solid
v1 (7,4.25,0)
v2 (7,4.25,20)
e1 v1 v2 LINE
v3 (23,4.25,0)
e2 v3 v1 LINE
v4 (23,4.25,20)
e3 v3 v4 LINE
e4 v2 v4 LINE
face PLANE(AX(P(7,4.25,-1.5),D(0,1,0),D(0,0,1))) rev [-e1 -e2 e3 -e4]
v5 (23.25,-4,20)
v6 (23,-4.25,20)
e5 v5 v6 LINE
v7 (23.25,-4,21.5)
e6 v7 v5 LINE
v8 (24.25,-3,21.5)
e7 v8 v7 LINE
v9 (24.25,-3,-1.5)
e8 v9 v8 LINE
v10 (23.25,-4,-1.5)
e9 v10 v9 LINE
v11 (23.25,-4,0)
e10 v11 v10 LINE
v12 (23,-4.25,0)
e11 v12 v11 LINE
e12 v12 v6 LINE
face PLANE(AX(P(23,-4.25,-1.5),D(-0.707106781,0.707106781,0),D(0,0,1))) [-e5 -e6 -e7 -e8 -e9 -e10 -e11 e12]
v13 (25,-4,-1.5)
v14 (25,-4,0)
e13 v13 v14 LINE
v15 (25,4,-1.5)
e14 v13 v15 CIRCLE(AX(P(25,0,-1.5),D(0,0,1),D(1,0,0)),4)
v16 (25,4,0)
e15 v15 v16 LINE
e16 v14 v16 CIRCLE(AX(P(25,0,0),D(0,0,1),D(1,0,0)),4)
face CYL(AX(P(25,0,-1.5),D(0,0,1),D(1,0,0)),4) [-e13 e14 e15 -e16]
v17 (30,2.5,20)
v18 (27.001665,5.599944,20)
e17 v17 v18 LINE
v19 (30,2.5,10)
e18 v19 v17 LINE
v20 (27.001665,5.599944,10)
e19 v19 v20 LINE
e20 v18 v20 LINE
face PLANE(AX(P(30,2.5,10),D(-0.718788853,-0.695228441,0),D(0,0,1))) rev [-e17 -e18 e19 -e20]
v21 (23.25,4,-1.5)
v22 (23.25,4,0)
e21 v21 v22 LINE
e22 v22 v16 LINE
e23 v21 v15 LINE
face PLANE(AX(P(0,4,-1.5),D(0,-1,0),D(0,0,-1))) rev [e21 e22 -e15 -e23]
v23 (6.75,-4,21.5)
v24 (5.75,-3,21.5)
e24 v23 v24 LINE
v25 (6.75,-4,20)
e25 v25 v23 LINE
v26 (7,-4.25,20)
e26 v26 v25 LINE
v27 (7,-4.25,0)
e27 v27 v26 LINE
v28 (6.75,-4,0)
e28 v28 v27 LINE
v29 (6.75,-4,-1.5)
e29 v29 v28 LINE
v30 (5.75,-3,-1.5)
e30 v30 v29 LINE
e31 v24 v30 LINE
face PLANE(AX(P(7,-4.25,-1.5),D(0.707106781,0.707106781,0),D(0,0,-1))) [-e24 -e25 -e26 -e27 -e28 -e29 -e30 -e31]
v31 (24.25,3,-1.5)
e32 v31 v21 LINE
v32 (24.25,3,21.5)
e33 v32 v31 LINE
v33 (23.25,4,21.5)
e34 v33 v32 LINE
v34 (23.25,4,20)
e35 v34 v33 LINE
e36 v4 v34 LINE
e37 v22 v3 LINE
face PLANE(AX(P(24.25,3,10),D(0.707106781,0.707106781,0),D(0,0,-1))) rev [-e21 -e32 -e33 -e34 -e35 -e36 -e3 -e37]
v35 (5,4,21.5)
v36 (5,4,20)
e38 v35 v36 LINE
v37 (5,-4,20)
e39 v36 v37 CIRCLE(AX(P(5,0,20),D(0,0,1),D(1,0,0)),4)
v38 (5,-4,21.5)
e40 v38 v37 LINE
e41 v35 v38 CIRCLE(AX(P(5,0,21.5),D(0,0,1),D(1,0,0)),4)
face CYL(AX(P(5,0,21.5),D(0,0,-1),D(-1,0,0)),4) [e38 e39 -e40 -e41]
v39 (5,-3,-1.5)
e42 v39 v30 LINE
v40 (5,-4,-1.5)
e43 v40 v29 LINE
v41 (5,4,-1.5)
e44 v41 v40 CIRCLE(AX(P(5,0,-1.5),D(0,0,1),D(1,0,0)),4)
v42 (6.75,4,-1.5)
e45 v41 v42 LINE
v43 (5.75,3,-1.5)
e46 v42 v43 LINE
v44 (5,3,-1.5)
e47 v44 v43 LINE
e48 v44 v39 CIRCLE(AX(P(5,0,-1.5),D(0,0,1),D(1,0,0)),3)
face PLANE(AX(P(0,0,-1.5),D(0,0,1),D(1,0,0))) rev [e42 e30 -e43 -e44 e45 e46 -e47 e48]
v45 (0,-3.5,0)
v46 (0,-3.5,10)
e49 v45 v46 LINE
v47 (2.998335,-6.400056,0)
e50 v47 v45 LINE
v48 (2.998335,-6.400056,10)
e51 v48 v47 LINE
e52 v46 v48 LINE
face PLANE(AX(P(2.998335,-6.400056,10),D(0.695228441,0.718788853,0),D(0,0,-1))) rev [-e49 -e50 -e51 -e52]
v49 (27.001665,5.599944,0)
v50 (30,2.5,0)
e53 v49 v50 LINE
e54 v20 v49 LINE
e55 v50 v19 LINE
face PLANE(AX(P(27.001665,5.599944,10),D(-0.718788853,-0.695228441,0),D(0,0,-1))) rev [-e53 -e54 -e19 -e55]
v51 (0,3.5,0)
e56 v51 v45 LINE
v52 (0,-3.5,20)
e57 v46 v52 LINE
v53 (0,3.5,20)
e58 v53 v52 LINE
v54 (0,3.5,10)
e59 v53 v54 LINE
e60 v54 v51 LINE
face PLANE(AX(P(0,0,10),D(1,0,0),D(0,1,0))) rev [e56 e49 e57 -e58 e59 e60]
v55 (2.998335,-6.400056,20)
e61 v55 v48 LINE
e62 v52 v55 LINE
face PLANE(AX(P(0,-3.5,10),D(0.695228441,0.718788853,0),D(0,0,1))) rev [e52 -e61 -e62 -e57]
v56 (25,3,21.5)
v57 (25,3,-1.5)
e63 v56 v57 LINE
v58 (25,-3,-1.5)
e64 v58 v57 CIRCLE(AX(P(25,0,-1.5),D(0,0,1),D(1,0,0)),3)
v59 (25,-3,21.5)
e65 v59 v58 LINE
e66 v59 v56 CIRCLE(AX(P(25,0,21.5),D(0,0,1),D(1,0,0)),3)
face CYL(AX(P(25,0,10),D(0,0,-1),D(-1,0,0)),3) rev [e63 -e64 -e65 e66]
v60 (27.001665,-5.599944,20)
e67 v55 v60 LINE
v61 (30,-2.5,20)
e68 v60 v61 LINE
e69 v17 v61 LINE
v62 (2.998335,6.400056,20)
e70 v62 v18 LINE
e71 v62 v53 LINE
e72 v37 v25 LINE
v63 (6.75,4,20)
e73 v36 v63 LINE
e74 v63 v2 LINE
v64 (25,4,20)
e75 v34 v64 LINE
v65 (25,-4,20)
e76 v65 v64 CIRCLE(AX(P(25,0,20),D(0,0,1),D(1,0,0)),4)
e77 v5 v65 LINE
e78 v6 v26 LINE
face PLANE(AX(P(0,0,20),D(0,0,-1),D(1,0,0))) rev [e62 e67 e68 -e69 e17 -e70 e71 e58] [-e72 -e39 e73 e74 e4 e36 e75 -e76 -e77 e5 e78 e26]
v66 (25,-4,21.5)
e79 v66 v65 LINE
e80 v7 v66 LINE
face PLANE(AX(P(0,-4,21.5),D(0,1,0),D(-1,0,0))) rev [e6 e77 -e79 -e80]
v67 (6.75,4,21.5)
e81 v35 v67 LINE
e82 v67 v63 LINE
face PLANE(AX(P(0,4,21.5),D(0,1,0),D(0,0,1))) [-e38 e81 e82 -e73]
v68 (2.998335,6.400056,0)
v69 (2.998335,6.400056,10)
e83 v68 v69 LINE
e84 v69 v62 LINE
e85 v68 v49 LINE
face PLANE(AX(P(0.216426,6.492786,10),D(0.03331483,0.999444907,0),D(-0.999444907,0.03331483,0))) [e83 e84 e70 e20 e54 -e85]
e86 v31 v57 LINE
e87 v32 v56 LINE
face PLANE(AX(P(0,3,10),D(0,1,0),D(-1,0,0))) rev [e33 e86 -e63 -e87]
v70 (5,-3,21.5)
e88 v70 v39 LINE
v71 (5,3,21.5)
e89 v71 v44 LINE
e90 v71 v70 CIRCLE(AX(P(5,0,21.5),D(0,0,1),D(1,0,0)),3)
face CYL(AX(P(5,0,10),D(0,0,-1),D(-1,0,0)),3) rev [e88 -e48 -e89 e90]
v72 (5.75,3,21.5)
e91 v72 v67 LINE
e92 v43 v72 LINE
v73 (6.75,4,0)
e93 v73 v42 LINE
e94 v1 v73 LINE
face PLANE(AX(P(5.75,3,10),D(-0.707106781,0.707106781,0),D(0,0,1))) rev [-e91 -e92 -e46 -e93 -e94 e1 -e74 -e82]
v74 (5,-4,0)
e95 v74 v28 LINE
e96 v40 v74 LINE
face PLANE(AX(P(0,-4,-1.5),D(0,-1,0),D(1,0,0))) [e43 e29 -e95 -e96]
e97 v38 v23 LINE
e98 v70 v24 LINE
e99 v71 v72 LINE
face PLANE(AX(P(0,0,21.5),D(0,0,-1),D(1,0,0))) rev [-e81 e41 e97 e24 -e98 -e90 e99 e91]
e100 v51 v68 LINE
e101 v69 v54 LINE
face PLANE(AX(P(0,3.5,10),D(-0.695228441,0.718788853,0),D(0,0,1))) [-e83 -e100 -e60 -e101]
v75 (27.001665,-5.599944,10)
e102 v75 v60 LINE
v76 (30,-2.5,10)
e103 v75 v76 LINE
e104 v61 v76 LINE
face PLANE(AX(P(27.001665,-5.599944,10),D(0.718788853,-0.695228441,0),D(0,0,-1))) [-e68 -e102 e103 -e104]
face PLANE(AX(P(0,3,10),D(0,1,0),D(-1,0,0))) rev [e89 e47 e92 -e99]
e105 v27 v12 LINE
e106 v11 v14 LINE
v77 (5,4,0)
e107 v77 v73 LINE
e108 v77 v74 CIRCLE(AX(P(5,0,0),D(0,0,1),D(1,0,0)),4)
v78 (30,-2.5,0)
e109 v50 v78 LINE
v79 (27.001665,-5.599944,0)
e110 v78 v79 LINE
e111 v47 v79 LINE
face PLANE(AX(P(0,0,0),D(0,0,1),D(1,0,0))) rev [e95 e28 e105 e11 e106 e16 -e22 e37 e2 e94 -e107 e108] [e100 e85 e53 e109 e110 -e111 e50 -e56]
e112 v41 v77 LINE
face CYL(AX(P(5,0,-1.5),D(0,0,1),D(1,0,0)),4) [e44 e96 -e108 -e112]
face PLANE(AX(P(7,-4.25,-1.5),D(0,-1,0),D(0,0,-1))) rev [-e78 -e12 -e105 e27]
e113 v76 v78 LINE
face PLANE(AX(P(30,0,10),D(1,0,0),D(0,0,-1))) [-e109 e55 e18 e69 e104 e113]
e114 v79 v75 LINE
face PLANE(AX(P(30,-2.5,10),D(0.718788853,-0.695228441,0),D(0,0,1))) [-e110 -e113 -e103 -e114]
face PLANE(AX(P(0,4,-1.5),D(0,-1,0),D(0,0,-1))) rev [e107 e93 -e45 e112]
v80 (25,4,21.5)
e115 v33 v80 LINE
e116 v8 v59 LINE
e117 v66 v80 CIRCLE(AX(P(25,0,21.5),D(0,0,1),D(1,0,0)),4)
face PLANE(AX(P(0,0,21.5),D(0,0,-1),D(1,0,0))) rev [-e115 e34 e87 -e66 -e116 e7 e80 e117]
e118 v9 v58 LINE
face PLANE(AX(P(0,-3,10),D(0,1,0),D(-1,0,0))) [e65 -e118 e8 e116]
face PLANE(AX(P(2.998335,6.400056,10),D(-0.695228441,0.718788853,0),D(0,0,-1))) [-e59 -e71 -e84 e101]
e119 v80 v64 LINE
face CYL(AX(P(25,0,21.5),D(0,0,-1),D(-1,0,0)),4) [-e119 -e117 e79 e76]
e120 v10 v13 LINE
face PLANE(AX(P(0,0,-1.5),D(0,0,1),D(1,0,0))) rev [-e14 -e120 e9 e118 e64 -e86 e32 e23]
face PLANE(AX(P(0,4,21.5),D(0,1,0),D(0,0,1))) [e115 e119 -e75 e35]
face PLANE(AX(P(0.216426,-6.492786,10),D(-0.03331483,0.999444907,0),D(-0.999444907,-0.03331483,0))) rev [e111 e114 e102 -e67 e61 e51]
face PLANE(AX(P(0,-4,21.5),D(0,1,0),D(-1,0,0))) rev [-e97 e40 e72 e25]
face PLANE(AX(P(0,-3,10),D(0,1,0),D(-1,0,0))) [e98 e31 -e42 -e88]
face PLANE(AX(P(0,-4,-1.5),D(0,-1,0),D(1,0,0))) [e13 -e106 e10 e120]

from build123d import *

# Parameters (mm, degrees)
BOSS_EXTRUDE1_DEPTH      = 10
CHAMFER1_SIZE            = 3
BOSS_EXTRUDE2_START      = -1.5
BOSS_EXTRUDE2_DEPTH      = 1.5
CHAMFER1_OF_MIRROR1_SIZE = 3
SKETCH2_W                = 16
SKETCH2_H                = 8.5
CUT_EXTRUDE1_DEPTH       = 39.340066647
CHAMFER2_SIZE            = 1.25


with BuildPart() as part:
    # Sketch1 → Boss-Extrude1 (new body)
    # profile 1 of 2: a face of its own
    with BuildSketch(Plane.XY):
        Polygon((30, 5.5), (30, -5.5), (0, -6.5), (0, 6.5), align=None)
        with BuildLine():
            ThreePointArc((5, 4), (1, 0), (5, -4))
            Line((5, -4), (25, -4))
            ThreePointArc((25, -4), (29, 0), (25, 4))
            Line((25, 4), (5, 4))
        make_face(mode=Mode.SUBTRACT)
    # profile 2 of 2: a face of its own
    with BuildSketch(Plane.XY):
        with BuildLine():
            Line((5, 4), (25, 4))
            ThreePointArc((25, 4), (29, 0), (25, -4))
            Line((25, -4), (5, -4))
            ThreePointArc((5, -4), (1, 0), (5, 4))
        make_face()
        with BuildLine():
            ThreePointArc((25, -3), (28, 0), (25, 3))
            Line((25, 3), (5, 3))
            ThreePointArc((5, 3), (2, 0), (5, -3))
            Line((5, -3), (25, -3))
        make_face(mode=Mode.SUBTRACT)
    boss_extrude1 = extrude(amount=BOSS_EXTRUDE1_DEPTH)

    # Chamfer1
    chamfer1_edges = [part.edges().sort_by_distance(p)[0] for p in [
        (30, -5.5, 5),
        (0, -6.5, 5),
        (0, 6.5, 5),
        (30, 5.5, 5),
    ]]
    chamfer(chamfer1_edges, length=CHAMFER1_SIZE)

    # Sketch1<4> → Boss-Extrude2 (add)
    with BuildSketch(Plane.XY.offset(BOSS_EXTRUDE2_START)):
        with BuildLine():
            Line((5, 4), (25, 4))
            ThreePointArc((25, 4), (29, 0), (25, -4))
            Line((25, -4), (5, -4))
            ThreePointArc((5, -4), (1, 0), (5, 4))
        make_face()
        with BuildLine():
            ThreePointArc((25, -3), (28, 0), (25, 3))
            Line((25, 3), (5, 3))
            ThreePointArc((5, 3), (2, 0), (5, -3))
            Line((5, -3), (25, -3))
        make_face(mode=Mode.SUBTRACT)
    boss_extrude2 = extrude(amount=BOSS_EXTRUDE2_DEPTH)


with BuildPart() as mirror1_1:
    # Mirror1: Boss-Extrude1, Boss-Extrude2 across plane
    add(boss_extrude1.mirror(Plane.XY.offset(10)))
    add(boss_extrude2.mirror(Plane.XY.offset(10)))

    # Chamfer1 of Mirror1
    chamfer1_of_mirror1_edges = [mirror1_1.edges().sort_by_distance(p)[0] for p in [
        (30, -5.5, 15),
        (0, -6.5, 15),
        (0, 6.5, 15),
        (30, 5.5, 15),
    ]]
    chamfer(chamfer1_of_mirror1_edges, length=CHAMFER1_OF_MIRROR1_SIZE)


with BuildPart() as part_1:
    add(part.part)

    # Mirror1 united with what the copies touc: union Mirror1_1
    add(mirror1_1.part)

    # Sketch2 → Cut-Extrude1 (cut, through all)
    with BuildSketch(Plane.XY.offset(21.5)):
        with Locations((15, 0)):
            Rectangle(SKETCH2_W, SKETCH2_H)
    extrude(amount=-CUT_EXTRUDE1_DEPTH, mode=Mode.SUBTRACT)

    # Chamfer2
    chamfer2_edges = [part_1.edges().sort_by_distance(p)[0] for p in [
        (23, -3, 10),
        (23, 3, 10),
        (7, -3, 10),
        (7, 3, 10),
    ]]
    chamfer(chamfer2_edges, length=CHAMFER2_SIZE - 0.0001)  # a hair under: the kernel refuses the full size


solid = part_1.part
